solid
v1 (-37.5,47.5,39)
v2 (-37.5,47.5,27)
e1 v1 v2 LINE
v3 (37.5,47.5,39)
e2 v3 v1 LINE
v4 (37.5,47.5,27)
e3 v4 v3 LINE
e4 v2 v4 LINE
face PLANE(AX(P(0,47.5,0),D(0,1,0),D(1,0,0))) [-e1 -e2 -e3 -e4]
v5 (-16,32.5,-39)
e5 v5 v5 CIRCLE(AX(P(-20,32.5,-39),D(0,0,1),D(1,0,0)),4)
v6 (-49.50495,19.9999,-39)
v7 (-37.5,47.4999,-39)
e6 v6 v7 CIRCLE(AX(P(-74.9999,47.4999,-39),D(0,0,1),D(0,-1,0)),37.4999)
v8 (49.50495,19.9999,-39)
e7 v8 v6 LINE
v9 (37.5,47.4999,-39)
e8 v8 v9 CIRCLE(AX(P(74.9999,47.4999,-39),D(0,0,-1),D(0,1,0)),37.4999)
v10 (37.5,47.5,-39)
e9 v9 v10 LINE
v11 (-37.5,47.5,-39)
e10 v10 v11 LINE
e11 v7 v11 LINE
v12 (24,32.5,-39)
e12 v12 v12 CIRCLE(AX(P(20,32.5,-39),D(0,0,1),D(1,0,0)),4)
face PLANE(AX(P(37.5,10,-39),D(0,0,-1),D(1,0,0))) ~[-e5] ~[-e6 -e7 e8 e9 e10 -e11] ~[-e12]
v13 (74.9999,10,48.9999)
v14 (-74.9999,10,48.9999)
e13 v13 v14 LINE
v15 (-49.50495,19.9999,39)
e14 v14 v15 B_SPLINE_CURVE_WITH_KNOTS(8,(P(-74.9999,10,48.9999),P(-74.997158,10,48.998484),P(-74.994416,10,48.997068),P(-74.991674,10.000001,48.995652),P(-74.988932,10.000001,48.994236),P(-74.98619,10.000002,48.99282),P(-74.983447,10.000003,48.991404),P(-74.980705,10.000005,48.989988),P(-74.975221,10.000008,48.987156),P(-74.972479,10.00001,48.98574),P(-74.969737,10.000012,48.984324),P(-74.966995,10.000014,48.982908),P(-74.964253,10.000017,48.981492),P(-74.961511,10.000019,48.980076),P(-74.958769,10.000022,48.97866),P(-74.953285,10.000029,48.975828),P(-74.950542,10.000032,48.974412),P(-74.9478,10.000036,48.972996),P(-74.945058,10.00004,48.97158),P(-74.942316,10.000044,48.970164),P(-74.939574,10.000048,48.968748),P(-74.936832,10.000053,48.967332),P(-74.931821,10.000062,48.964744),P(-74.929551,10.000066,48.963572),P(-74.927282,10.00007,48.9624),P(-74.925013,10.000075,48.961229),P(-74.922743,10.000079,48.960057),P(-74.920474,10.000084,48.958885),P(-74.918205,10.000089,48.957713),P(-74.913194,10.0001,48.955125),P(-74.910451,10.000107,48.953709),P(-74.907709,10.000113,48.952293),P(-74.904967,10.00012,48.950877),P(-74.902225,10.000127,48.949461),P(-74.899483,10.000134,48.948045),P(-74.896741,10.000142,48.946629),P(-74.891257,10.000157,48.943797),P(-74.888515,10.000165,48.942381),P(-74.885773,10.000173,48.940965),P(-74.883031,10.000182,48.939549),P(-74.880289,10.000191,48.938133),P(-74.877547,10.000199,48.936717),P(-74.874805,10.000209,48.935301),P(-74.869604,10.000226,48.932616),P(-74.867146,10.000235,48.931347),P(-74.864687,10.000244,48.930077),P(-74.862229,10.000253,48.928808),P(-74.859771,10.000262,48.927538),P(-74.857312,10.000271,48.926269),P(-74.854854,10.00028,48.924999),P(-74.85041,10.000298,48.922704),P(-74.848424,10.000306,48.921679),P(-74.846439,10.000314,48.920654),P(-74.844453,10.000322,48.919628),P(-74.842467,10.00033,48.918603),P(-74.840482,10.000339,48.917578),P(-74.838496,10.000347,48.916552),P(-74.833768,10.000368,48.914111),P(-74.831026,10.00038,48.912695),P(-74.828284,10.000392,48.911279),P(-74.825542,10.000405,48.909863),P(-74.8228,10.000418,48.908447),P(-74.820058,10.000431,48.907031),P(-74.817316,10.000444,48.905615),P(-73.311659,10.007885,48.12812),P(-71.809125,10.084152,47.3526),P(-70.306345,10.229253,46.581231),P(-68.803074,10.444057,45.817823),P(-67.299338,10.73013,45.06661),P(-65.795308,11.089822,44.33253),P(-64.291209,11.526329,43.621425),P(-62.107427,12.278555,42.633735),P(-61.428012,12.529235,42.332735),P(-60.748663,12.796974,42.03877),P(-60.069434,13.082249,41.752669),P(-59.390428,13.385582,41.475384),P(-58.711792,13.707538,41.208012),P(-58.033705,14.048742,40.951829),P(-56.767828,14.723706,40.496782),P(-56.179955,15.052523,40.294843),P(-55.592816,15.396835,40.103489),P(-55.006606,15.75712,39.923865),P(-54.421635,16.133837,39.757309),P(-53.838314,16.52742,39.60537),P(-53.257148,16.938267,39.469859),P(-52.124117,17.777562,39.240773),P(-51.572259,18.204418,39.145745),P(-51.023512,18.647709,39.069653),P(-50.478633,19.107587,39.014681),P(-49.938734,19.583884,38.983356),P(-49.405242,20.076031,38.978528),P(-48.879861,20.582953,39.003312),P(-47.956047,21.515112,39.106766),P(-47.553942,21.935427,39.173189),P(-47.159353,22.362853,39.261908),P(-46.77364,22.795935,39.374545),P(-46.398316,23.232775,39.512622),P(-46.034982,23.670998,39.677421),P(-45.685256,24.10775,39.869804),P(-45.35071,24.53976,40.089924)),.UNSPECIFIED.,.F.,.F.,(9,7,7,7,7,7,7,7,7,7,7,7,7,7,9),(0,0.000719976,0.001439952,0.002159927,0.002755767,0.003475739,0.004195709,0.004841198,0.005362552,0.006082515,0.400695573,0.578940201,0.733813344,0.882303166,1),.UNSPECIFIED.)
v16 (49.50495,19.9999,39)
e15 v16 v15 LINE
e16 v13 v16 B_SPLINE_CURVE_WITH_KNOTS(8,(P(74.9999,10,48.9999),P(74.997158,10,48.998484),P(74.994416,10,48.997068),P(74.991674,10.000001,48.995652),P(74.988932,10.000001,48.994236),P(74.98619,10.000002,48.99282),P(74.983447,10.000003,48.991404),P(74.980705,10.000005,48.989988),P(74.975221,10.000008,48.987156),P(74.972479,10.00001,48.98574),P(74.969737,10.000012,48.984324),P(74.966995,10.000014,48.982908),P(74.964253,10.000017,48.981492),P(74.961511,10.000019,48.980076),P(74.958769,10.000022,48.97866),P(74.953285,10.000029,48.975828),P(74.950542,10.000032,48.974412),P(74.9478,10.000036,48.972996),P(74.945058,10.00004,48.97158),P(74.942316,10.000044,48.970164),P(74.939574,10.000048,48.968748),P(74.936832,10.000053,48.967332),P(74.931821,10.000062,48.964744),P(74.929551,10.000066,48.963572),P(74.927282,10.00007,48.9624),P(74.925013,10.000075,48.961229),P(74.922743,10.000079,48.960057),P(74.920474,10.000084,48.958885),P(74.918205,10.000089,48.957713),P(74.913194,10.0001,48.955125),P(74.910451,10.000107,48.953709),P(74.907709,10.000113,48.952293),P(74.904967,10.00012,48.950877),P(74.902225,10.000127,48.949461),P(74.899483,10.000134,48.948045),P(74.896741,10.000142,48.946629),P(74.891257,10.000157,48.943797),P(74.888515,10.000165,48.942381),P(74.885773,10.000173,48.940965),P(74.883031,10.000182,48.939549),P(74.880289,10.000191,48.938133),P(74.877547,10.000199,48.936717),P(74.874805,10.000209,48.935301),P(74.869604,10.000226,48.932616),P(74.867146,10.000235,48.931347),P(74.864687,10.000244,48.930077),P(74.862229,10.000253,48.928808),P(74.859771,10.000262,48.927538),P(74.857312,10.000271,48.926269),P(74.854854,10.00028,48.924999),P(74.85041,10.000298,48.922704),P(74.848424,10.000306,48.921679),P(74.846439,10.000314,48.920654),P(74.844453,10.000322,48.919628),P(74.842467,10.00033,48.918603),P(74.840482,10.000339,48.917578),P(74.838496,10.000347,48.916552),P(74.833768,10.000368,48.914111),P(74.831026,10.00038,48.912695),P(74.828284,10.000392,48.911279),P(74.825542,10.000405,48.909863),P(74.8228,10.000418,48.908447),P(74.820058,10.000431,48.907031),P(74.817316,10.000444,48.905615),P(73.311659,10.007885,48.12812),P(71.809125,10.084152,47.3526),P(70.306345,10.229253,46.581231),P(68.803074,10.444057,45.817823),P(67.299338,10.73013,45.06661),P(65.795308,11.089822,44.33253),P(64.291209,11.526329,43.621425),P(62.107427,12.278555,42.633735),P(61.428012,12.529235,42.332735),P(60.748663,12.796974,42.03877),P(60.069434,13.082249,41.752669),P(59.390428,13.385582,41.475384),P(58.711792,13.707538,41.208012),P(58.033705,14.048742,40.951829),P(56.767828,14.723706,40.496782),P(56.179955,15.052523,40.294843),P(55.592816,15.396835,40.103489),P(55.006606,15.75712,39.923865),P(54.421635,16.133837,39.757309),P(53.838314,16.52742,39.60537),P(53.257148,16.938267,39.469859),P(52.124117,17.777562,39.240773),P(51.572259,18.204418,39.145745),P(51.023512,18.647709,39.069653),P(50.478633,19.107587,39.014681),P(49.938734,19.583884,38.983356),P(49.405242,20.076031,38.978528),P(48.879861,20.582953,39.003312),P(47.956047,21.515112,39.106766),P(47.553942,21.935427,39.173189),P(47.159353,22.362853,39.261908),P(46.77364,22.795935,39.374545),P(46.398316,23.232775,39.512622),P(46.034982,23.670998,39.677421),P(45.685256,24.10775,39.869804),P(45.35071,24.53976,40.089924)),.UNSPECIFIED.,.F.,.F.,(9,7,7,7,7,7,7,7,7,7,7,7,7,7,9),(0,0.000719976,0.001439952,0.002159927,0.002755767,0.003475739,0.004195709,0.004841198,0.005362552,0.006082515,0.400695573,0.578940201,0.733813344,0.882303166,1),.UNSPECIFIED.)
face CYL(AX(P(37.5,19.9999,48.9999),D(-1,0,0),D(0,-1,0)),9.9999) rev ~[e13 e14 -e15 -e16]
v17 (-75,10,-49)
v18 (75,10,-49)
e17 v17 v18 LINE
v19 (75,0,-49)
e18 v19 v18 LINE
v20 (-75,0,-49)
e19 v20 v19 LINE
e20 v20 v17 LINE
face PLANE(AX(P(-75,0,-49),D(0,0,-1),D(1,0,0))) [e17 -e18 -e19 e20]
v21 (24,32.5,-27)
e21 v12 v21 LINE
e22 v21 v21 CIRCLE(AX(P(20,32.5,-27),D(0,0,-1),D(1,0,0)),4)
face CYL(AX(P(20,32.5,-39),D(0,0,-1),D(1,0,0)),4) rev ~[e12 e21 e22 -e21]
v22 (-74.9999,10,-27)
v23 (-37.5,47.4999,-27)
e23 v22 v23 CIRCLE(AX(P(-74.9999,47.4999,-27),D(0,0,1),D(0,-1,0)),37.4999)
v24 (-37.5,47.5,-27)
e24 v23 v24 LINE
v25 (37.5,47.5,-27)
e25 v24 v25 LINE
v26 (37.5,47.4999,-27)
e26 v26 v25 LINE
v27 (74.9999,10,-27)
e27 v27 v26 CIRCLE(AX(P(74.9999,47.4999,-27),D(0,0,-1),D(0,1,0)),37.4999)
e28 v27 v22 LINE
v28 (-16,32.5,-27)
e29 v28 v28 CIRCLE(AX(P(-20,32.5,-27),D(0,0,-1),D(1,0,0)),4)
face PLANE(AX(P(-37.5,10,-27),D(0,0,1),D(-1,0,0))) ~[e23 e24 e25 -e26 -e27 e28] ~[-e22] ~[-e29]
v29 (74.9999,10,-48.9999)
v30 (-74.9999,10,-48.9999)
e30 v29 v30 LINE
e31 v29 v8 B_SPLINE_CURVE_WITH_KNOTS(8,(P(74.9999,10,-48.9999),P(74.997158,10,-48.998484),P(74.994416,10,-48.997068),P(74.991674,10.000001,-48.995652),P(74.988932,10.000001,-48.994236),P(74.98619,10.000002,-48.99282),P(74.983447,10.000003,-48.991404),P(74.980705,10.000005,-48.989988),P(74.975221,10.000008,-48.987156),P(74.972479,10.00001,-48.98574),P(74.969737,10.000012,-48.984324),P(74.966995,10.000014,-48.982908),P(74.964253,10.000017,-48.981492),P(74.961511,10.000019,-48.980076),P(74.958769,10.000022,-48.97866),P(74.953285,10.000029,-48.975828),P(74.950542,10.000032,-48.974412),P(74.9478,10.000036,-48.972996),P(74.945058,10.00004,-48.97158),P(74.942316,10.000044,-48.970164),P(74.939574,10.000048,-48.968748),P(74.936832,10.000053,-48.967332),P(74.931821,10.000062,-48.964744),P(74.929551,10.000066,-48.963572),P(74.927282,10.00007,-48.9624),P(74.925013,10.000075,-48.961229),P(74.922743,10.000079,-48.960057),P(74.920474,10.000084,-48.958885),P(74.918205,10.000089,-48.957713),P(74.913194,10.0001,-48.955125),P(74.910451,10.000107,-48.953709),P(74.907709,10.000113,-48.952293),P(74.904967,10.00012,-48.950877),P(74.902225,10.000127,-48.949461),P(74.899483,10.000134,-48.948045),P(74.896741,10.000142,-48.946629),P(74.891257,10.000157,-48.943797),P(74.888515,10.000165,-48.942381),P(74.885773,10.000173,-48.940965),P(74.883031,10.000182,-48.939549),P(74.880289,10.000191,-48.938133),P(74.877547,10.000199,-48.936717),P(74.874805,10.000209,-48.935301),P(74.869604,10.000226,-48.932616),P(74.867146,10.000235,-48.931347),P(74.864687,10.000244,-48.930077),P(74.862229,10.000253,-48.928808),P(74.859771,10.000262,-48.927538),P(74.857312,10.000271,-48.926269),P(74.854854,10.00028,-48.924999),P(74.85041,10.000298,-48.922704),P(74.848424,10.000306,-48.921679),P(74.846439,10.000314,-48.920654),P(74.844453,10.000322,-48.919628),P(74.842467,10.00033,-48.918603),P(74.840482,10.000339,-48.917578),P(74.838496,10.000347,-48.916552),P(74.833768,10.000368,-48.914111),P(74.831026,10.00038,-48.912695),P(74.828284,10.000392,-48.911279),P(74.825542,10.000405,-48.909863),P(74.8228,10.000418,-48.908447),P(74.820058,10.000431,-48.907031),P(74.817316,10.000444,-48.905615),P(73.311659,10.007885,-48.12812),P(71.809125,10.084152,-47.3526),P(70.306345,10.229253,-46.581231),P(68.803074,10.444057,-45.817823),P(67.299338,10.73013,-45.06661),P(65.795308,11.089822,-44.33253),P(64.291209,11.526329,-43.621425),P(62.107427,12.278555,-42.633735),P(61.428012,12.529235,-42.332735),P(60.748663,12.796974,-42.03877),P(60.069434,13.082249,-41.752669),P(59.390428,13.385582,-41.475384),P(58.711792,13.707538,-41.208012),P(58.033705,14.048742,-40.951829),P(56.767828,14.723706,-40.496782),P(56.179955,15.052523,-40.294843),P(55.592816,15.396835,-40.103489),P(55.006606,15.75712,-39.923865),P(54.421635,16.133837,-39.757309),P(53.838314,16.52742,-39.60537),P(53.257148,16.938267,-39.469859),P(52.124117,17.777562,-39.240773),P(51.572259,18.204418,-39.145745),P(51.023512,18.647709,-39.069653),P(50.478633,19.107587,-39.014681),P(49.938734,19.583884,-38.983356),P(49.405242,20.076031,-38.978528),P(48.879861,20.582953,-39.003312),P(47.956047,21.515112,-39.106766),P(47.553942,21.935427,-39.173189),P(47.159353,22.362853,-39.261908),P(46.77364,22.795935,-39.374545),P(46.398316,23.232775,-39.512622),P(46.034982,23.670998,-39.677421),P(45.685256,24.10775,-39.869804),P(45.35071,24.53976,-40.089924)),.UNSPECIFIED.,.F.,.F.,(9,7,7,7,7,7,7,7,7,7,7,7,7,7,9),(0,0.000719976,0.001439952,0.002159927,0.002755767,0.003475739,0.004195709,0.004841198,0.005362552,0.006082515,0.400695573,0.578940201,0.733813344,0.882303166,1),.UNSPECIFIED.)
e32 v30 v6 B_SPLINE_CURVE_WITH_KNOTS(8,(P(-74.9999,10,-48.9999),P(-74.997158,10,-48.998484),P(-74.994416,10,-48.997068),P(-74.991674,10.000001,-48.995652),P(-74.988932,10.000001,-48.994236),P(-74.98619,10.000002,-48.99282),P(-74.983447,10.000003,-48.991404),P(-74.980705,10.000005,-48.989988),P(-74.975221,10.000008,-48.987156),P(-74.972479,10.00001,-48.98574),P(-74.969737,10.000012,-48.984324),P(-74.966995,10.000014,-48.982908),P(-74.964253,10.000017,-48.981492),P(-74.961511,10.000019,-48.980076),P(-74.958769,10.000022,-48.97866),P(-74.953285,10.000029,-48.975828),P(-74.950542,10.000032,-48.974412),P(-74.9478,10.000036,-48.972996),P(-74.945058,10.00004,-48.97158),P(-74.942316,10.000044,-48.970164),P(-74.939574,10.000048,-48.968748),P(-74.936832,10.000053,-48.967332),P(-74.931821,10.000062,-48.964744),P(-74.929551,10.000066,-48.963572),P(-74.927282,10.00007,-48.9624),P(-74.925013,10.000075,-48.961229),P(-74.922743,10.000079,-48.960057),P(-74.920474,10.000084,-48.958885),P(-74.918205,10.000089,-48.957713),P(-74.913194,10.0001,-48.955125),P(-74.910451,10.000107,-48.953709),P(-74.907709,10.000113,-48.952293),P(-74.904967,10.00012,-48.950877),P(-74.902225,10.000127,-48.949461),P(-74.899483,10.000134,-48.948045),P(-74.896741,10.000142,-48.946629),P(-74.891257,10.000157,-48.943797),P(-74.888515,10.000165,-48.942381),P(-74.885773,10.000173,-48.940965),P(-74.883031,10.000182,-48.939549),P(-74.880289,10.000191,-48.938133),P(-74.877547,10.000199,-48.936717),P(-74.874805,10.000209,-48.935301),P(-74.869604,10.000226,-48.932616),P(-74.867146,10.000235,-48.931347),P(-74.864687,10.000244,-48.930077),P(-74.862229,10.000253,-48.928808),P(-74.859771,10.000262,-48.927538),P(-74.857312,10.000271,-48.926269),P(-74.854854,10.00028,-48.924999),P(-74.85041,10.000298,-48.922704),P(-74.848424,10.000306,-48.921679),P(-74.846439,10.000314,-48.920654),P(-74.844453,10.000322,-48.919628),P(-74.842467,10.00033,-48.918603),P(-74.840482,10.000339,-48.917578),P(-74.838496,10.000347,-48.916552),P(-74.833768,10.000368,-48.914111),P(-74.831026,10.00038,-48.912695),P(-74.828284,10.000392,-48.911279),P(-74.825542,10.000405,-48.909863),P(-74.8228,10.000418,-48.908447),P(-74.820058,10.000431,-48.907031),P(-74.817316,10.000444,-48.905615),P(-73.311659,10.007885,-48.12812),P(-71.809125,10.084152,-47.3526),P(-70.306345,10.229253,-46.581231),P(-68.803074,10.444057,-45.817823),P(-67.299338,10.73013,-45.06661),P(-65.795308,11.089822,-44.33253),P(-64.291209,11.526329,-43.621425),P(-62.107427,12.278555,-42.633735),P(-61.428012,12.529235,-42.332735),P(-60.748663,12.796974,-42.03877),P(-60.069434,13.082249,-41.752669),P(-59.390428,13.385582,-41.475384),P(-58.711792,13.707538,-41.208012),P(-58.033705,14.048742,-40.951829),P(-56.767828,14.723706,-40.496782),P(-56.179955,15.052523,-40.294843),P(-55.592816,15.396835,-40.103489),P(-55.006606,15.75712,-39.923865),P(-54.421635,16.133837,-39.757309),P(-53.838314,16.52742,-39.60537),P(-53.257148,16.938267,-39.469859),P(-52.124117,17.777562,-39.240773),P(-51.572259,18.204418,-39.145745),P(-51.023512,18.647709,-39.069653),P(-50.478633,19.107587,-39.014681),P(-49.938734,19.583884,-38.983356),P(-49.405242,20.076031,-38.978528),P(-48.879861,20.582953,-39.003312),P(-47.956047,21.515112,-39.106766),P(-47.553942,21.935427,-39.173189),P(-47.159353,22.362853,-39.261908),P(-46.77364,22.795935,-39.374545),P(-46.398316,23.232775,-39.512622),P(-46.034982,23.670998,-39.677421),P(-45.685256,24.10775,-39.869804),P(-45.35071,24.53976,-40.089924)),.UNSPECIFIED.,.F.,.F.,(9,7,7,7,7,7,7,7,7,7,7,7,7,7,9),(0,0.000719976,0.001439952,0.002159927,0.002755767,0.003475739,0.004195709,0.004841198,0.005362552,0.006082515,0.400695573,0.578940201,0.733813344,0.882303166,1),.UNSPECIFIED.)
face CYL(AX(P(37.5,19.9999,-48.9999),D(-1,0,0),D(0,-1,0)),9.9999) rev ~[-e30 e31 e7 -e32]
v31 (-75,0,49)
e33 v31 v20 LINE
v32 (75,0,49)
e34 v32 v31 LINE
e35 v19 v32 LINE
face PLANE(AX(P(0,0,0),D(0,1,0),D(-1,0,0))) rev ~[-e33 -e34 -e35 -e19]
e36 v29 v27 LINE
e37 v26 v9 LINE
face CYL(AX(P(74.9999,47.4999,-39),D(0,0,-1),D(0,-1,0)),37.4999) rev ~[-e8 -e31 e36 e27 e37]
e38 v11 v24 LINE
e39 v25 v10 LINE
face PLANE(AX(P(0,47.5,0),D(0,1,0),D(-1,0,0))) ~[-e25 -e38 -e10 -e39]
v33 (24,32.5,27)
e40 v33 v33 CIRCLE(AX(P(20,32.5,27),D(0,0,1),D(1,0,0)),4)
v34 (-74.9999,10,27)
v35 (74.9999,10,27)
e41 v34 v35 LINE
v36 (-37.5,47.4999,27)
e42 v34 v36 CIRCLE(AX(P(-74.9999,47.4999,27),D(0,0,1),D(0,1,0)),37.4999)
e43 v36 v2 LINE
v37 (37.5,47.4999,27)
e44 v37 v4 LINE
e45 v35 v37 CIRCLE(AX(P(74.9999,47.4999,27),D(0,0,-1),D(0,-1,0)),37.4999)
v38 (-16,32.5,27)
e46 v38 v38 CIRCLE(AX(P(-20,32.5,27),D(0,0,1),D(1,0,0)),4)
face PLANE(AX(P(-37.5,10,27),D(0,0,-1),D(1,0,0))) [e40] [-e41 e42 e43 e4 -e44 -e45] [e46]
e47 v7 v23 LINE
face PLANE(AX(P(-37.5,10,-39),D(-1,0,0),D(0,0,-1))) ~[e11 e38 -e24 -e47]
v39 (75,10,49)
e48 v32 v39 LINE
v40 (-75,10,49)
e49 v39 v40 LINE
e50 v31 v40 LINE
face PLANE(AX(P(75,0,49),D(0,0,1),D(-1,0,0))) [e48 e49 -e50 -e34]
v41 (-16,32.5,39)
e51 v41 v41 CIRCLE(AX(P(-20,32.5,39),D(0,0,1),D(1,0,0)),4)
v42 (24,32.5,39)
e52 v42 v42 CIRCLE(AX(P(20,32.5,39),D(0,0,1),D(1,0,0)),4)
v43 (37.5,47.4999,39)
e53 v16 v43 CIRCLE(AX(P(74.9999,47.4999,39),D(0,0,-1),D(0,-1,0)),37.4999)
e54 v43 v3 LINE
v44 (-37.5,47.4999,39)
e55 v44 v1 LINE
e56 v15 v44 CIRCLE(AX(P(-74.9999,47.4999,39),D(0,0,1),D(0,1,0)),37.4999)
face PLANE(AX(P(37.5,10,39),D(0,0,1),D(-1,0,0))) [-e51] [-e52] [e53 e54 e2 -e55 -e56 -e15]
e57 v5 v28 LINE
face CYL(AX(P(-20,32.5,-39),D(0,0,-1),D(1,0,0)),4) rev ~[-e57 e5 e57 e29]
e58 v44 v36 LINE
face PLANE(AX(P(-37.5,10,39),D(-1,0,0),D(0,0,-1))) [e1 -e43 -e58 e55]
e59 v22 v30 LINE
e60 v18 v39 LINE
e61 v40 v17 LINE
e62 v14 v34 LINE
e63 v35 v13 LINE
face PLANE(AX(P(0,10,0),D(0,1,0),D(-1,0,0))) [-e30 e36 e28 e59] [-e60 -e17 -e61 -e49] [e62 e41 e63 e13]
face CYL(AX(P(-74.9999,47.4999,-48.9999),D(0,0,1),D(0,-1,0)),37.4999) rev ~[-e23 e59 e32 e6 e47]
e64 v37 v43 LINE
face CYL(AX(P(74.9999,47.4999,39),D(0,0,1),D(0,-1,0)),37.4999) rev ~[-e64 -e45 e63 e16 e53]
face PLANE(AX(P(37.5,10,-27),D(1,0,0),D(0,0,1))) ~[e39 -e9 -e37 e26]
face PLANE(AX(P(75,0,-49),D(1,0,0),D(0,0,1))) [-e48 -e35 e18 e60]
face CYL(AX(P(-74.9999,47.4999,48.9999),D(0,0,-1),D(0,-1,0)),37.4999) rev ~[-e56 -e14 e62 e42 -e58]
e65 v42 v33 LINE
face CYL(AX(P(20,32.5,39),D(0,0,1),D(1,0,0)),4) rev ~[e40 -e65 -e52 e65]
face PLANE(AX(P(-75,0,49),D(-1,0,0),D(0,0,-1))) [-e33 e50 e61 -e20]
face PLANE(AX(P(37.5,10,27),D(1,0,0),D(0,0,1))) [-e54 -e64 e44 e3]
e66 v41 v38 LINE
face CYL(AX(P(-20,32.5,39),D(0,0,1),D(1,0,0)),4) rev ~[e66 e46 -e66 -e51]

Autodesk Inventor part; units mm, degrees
ref_plane "YZ Plane" through (0, 0, 0) normal (1, 0, 0) x (0, 1, 0)
ref_plane "XZ Plane" through (0, 0, 0) normal (0, 1, 0) x (-1, 0, 0)
ref_plane "XY Plane" through (0, 0, 0) normal (0, 0, 1) x (1, 0, 0)
sketch "Sketch1" plane through (0, 0, 0) normal (0, 1, 0) x (-1, 0, 0)
  line L0 (75, 49) -> (75, -49)
  line L1 (75, -49) -> (-75, -49)
  line L2 (-75, -49) -> (-75, 49)
  line L3 (-75, 49) -> (75, 49)
  point P0 (0, 0)
  dimension "d0" = 98
  dimension "d1" = 150
  dimension "d2" = 75
  dimension "d3" = 49
extrude "Extrusion1" add sketch "Sketch1" along normal blind 10
sketch "Sketch2" plane through (0, 10, 0) normal (0, 1, 0) x (1, 0, 0)
  line L0 (-37.5, -39) -> (-37.5, -27)
  line L1 (-37.5, -27) -> (37.5, -27)
  line L2 (37.5, -27) -> (37.5, -39)
  line L3 (37.5, -39) -> (-37.5, -39)
  line L4 (-75, -49) -> (75, -49) projected
  point P0 (0, 0)
  point P1 (-37.5, -33)
  dimension "d6" = 12
  dimension "d8" = 37.5
  dimension "d9" = 75
  dimension "d14" = 33
extrude "Extrusion2" add sketch "Sketch2" along normal blind 37.5
fillet "Face Fillet3" radius 10 1 edges at (0, 10, 39)
sketch "Sketch3" plane through (-37.5, 47.5, 39) normal (0, 0, 1) x (1, 0, 0)
  circle A0 centre (17.5, -15) radius 4
  circle A1 centre (57.5, -15) radius 4
  line L0 (-37.5, -47.5) -> (112.5, -47.5) projected
  line L1 (0, 0) -> (75, 0) projected
  point P0 (37.5, -47.5)
  point P1 (37.5, 0)
  dimension "d16" = 8
  dimension "d17" = 8
  dimension "d18" = 32.5
  dimension "d19" = 32.5
  dimension "d20" = 40
  dimension "d21" = 20
fillet "Face Fillet4" radius 37.5 1 edges at (37.5, 10, 33)
fillet "Face Fillet5" radius 37.5 1 edges at (-37.5, 10, 33)
extrude "Extrusion3" cut sketch "Sketch3" against normal blind 80
mirror "Mirror1" about plane through (0, 0, 0) normal (0, 0, 1) of "Extrusion2", "Face Fillet3", "Face Fillet4", "Face Fillet5", "Extrusion3"
thread "Thread5" size "M8x1.25" class "6H" standard "ANSI Metric M Profile" length 350
thread "Thread6" size "M8x1.25" class "6H" standard "ANSI Metric M Profile" length 350
thread "Thread7" size "M8x1.25" class "6H" standard "ANSI Metric M Profile" length 350
thread "Thread8" size "M8x1.25" class "6H" standard "ANSI Metric M Profile" length 350
properties part number "Base Macaco" material "Steel AISI 1050"
